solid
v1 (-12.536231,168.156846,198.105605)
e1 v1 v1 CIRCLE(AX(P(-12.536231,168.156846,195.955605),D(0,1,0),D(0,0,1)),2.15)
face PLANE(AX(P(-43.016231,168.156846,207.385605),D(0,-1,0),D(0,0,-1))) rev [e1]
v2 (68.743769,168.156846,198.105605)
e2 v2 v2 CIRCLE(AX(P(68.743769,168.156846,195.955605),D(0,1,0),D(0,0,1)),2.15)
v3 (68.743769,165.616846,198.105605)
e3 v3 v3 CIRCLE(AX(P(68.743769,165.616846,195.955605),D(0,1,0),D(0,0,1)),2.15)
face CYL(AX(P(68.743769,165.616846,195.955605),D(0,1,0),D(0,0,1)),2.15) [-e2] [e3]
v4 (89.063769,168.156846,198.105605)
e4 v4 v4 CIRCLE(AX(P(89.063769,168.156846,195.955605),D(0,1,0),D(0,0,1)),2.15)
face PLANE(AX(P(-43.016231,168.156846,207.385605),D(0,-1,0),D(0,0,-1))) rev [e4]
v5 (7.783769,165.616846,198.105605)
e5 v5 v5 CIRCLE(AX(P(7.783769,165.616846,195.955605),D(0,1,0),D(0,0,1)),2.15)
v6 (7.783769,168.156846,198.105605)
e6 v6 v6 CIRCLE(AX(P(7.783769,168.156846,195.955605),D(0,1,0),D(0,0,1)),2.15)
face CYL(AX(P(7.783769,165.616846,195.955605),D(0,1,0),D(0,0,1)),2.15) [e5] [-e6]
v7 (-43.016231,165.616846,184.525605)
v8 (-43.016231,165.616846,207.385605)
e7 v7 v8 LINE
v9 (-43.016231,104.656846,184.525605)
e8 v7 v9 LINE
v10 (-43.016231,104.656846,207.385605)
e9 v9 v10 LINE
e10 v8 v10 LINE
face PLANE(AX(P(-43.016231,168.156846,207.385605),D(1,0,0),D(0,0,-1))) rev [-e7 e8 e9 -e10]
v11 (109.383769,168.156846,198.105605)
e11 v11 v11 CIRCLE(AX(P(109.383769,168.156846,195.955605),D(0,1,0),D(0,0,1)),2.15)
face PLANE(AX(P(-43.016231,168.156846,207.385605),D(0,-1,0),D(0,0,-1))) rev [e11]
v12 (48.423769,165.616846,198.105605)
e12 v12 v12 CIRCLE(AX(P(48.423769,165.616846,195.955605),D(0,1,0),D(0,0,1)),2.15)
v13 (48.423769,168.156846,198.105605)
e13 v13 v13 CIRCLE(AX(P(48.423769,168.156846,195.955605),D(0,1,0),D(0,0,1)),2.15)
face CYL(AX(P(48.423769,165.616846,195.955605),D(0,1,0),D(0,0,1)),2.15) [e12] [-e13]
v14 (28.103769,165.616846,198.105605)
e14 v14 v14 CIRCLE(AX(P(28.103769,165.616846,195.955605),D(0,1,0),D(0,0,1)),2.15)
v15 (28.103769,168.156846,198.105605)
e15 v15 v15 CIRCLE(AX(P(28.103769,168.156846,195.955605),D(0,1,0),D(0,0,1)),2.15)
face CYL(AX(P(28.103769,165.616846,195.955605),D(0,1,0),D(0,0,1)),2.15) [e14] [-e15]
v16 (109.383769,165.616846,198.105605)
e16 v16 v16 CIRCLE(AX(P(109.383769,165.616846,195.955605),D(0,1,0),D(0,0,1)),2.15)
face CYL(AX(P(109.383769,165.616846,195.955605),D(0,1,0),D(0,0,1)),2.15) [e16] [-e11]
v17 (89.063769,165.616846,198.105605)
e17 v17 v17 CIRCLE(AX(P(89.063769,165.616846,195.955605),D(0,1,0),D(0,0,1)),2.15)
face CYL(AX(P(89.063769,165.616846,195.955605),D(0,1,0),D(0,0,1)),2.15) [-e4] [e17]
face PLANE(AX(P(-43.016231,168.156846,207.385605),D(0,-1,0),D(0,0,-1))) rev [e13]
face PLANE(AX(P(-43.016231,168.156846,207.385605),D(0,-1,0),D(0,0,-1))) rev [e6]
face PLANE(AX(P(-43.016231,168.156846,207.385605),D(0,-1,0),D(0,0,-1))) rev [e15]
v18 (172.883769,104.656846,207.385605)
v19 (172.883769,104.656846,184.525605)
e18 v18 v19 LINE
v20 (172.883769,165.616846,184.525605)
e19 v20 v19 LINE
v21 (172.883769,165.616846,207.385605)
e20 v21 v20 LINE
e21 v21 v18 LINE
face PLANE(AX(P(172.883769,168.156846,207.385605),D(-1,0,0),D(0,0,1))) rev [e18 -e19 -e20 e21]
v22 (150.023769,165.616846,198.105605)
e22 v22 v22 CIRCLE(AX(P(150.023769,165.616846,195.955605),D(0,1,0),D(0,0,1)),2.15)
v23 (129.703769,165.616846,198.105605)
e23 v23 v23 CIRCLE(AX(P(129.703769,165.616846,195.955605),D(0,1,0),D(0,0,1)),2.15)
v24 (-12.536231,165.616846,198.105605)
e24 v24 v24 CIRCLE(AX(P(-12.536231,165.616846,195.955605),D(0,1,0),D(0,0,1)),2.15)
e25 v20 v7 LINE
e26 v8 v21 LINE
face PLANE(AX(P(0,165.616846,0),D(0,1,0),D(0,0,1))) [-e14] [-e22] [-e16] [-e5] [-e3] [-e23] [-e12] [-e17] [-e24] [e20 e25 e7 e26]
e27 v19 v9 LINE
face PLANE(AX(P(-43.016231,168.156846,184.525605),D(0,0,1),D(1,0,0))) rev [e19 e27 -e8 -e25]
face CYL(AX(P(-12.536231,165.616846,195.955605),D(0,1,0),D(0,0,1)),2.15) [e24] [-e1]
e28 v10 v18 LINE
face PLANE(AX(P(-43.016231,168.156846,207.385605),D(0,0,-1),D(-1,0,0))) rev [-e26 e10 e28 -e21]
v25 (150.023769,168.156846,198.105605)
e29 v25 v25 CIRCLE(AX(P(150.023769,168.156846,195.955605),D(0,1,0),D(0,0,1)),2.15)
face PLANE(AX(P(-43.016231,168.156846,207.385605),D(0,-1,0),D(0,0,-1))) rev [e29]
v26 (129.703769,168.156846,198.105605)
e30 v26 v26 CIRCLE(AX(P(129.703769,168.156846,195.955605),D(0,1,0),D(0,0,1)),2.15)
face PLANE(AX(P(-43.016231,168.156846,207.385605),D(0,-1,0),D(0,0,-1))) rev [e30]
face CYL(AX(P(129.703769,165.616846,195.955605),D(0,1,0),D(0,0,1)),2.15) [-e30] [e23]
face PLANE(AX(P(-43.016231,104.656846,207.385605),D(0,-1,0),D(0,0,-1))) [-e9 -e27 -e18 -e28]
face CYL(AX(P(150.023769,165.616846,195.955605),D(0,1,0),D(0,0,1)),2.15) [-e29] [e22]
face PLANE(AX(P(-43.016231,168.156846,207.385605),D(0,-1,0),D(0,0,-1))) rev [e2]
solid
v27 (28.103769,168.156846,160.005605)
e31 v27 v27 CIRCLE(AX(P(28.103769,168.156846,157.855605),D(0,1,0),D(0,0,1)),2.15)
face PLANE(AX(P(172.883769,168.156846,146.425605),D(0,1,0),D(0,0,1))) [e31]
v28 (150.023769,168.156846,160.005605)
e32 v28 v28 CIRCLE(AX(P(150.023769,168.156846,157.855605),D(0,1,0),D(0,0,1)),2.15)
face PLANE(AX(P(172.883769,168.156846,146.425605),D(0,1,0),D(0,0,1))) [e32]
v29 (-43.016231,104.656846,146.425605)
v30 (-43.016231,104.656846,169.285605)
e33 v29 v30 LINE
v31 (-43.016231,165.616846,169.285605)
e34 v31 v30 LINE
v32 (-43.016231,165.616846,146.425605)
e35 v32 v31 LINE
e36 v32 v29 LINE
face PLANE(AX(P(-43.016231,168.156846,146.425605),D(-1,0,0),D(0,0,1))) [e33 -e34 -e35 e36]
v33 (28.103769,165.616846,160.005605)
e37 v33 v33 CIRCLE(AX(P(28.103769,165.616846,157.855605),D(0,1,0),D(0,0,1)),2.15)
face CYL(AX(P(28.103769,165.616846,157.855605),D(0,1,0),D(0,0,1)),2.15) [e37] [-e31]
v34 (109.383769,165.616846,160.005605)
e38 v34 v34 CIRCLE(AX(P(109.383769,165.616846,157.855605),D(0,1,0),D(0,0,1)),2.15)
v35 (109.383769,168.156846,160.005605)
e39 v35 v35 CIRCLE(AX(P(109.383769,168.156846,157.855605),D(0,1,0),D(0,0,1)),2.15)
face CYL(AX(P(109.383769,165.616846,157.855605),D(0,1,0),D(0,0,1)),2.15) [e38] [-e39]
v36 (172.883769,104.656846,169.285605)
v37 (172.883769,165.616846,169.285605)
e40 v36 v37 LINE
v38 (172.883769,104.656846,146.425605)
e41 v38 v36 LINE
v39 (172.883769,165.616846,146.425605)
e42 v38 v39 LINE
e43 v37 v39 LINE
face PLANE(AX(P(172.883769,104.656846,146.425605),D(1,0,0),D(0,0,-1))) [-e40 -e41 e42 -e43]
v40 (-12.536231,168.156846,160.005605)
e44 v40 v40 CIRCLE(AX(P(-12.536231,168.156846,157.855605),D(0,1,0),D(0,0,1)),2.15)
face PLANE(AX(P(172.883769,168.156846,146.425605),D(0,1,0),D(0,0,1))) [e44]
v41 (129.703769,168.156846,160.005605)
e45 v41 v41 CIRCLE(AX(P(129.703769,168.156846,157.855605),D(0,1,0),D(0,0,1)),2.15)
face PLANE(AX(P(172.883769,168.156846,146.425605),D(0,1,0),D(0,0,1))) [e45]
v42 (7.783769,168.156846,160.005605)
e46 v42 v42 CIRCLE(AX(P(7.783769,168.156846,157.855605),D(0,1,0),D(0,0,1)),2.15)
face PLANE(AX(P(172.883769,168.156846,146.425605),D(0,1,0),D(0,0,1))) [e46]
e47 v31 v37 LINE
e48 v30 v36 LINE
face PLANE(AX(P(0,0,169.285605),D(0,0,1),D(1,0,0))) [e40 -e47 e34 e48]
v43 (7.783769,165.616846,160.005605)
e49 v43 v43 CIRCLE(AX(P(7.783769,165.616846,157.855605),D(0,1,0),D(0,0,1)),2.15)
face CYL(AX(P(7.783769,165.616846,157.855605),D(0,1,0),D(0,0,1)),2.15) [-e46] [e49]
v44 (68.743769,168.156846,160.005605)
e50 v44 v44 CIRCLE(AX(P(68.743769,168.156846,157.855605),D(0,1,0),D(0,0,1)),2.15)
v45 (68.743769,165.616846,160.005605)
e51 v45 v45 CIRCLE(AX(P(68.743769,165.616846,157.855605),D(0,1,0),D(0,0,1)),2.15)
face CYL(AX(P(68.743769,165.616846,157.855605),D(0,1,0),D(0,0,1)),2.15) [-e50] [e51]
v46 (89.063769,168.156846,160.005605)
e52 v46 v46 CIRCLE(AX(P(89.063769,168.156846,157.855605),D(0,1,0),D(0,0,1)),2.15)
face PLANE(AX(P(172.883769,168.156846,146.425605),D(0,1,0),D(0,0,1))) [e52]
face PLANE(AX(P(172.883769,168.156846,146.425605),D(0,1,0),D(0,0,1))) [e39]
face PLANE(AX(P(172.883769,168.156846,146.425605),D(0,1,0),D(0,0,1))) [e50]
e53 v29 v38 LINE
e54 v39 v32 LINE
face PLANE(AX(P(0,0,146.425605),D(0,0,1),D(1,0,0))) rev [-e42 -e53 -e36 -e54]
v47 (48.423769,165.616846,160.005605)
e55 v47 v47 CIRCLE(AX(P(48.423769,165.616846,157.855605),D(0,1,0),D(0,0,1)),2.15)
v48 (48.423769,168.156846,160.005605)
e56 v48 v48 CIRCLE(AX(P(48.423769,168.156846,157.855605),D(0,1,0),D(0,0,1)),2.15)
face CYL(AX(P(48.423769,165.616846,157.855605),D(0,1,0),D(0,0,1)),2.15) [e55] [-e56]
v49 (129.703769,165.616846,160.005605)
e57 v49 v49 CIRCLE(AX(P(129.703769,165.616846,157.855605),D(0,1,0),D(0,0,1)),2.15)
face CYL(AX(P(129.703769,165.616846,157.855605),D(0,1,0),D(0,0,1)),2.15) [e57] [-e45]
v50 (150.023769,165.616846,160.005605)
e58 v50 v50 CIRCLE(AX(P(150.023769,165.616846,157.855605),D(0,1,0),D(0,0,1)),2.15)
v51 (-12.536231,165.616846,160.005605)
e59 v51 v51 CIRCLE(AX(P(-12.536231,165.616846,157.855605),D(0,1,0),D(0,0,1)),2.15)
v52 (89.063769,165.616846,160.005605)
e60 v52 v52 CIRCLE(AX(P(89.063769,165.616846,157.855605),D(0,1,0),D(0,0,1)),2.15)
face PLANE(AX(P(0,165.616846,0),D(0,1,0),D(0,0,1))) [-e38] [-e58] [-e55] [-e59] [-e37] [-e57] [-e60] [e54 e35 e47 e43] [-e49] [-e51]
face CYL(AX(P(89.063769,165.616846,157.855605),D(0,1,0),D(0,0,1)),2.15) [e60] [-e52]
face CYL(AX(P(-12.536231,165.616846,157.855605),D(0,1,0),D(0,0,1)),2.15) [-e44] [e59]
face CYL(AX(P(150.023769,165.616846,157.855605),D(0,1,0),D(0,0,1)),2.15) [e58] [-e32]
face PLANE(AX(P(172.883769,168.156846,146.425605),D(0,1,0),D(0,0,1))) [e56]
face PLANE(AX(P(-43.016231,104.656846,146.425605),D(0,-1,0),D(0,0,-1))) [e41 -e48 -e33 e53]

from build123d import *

# Parameters (mm, degrees)
SKETCH1_W                = 215.9
SKETCH1_H                = 63.5
BOSS_EXTRUDE1_DEPTH      = 22.86
CUT_EXTRUDE1_START       = -2.54
CUT_EXTRUDE1_OUTLINE_W   = 215.9
CUT_EXTRUDE1_OUTLINE_H   = 22.86
CUT_EXTRUDE1_OUTLINE_R   = 2.15
CUT_EXTRUDE1_DEPTH       = 2.54
CUT_EXTRUDE1_START_2     = -63.5
CUT_EXTRUDE1_2_OUTLINE_W = 215.9
CUT_EXTRUDE1_2_OUTLINE_H = 22.86
CUT_EXTRUDE1_2_DEPTH     = 60.96
CUT_EXTRUDE1_3_OUTLINE_R = 2.15
CUT_EXTRUDE1_3_DEPTH     = 2.54


# Read off the part's stored shape, not the designer's step: Cut-Extrude1
with BuildPart() as part:
    # Sketch1 → Boss-Extrude1 (new body)
    with BuildSketch(Plane.XY.offset(169.285605486)):
        with Locations((64.933768792, 136.406845874)):
            Rectangle(SKETCH1_W, SKETCH1_H)
    extrude(amount=-BOSS_EXTRUDE1_DEPTH)

    # Cut-Extrude1 outline → Cut-Extrude1 (cut)
    with BuildSketch(Plane(origin=(0, 168.156845874, 0), x_dir=(1, 0, 0), z_dir=(0, 1, 0)).offset(CUT_EXTRUDE1_START)):
        with Locations((64.933768792, -157.855605486)):
            Rectangle(CUT_EXTRUDE1_OUTLINE_W, CUT_EXTRUDE1_OUTLINE_H)
        with Locations((-12.536231208, -157.855605486)):
            Circle(CUT_EXTRUDE1_OUTLINE_R, mode=Mode.SUBTRACT)
        with Locations((7.783768792, -157.855605486)):
            Circle(CUT_EXTRUDE1_OUTLINE_R, mode=Mode.SUBTRACT)
        with Locations((28.103768792, -157.855605486)):
            Circle(CUT_EXTRUDE1_OUTLINE_R, mode=Mode.SUBTRACT)
        with Locations((48.423768792, -157.855605486)):
            Circle(CUT_EXTRUDE1_OUTLINE_R, mode=Mode.SUBTRACT)
        with Locations((68.743768792, -157.855605486)):
            Circle(CUT_EXTRUDE1_OUTLINE_R, mode=Mode.SUBTRACT)
        with Locations((89.063768792, -157.855605486)):
            Circle(CUT_EXTRUDE1_OUTLINE_R, mode=Mode.SUBTRACT)
        with Locations((109.383768792, -157.855605486)):
            Circle(CUT_EXTRUDE1_OUTLINE_R, mode=Mode.SUBTRACT)
        with Locations((129.703768792, -157.855605486)):
            Circle(CUT_EXTRUDE1_OUTLINE_R, mode=Mode.SUBTRACT)
        with Locations((150.023768792, -157.855605486)):
            Circle(CUT_EXTRUDE1_OUTLINE_R, mode=Mode.SUBTRACT)
    extrude(amount=CUT_EXTRUDE1_DEPTH, mode=Mode.SUBTRACT)


with BuildPart() as body_2:
    # Cut-Extrude1 2 outline → Cut-Extrude1 2 (new body)
    with BuildSketch(Plane(origin=(0, 168.156845874, 0), x_dir=(1, 0, 0), z_dir=(0, 1, 0)).offset(CUT_EXTRUDE1_START_2)):
        with Locations((64.933768792, -195.955605486)):
            Rectangle(CUT_EXTRUDE1_2_OUTLINE_W, CUT_EXTRUDE1_2_OUTLINE_H)
    extrude(amount=CUT_EXTRUDE1_2_DEPTH)

    # Cut-Extrude1 3 outline → Cut-Extrude1 3 (add)
    with BuildSketch(Plane(origin=(0, 168.156845874, 0), x_dir=(1, 0, 0), z_dir=(0, 1, 0)).offset(CUT_EXTRUDE1_START)):
        with Locations((-12.536231208, -195.955605486)):
            Circle(CUT_EXTRUDE1_3_OUTLINE_R)
        with Locations((7.783768792, -195.955605486)):
            Circle(CUT_EXTRUDE1_3_OUTLINE_R)
        with Locations((28.103768792, -195.955605486)):
            Circle(CUT_EXTRUDE1_3_OUTLINE_R)
        with Locations((48.423768792, -195.955605486)):
            Circle(CUT_EXTRUDE1_3_OUTLINE_R)
        with Locations((68.743768792, -195.955605486)):
            Circle(CUT_EXTRUDE1_3_OUTLINE_R)
        with Locations((89.063768792, -195.955605486)):
            Circle(CUT_EXTRUDE1_3_OUTLINE_R)
        with Locations((109.383768792, -195.955605486)):
            Circle(CUT_EXTRUDE1_3_OUTLINE_R)
        with Locations((129.703768792, -195.955605486)):
            Circle(CUT_EXTRUDE1_3_OUTLINE_R)
        with Locations((150.023768792, -195.955605486)):
            Circle(CUT_EXTRUDE1_3_OUTLINE_R)
    extrude(amount=CUT_EXTRUDE1_3_DEPTH)


solid = Compound([part.part, body_2.part])
